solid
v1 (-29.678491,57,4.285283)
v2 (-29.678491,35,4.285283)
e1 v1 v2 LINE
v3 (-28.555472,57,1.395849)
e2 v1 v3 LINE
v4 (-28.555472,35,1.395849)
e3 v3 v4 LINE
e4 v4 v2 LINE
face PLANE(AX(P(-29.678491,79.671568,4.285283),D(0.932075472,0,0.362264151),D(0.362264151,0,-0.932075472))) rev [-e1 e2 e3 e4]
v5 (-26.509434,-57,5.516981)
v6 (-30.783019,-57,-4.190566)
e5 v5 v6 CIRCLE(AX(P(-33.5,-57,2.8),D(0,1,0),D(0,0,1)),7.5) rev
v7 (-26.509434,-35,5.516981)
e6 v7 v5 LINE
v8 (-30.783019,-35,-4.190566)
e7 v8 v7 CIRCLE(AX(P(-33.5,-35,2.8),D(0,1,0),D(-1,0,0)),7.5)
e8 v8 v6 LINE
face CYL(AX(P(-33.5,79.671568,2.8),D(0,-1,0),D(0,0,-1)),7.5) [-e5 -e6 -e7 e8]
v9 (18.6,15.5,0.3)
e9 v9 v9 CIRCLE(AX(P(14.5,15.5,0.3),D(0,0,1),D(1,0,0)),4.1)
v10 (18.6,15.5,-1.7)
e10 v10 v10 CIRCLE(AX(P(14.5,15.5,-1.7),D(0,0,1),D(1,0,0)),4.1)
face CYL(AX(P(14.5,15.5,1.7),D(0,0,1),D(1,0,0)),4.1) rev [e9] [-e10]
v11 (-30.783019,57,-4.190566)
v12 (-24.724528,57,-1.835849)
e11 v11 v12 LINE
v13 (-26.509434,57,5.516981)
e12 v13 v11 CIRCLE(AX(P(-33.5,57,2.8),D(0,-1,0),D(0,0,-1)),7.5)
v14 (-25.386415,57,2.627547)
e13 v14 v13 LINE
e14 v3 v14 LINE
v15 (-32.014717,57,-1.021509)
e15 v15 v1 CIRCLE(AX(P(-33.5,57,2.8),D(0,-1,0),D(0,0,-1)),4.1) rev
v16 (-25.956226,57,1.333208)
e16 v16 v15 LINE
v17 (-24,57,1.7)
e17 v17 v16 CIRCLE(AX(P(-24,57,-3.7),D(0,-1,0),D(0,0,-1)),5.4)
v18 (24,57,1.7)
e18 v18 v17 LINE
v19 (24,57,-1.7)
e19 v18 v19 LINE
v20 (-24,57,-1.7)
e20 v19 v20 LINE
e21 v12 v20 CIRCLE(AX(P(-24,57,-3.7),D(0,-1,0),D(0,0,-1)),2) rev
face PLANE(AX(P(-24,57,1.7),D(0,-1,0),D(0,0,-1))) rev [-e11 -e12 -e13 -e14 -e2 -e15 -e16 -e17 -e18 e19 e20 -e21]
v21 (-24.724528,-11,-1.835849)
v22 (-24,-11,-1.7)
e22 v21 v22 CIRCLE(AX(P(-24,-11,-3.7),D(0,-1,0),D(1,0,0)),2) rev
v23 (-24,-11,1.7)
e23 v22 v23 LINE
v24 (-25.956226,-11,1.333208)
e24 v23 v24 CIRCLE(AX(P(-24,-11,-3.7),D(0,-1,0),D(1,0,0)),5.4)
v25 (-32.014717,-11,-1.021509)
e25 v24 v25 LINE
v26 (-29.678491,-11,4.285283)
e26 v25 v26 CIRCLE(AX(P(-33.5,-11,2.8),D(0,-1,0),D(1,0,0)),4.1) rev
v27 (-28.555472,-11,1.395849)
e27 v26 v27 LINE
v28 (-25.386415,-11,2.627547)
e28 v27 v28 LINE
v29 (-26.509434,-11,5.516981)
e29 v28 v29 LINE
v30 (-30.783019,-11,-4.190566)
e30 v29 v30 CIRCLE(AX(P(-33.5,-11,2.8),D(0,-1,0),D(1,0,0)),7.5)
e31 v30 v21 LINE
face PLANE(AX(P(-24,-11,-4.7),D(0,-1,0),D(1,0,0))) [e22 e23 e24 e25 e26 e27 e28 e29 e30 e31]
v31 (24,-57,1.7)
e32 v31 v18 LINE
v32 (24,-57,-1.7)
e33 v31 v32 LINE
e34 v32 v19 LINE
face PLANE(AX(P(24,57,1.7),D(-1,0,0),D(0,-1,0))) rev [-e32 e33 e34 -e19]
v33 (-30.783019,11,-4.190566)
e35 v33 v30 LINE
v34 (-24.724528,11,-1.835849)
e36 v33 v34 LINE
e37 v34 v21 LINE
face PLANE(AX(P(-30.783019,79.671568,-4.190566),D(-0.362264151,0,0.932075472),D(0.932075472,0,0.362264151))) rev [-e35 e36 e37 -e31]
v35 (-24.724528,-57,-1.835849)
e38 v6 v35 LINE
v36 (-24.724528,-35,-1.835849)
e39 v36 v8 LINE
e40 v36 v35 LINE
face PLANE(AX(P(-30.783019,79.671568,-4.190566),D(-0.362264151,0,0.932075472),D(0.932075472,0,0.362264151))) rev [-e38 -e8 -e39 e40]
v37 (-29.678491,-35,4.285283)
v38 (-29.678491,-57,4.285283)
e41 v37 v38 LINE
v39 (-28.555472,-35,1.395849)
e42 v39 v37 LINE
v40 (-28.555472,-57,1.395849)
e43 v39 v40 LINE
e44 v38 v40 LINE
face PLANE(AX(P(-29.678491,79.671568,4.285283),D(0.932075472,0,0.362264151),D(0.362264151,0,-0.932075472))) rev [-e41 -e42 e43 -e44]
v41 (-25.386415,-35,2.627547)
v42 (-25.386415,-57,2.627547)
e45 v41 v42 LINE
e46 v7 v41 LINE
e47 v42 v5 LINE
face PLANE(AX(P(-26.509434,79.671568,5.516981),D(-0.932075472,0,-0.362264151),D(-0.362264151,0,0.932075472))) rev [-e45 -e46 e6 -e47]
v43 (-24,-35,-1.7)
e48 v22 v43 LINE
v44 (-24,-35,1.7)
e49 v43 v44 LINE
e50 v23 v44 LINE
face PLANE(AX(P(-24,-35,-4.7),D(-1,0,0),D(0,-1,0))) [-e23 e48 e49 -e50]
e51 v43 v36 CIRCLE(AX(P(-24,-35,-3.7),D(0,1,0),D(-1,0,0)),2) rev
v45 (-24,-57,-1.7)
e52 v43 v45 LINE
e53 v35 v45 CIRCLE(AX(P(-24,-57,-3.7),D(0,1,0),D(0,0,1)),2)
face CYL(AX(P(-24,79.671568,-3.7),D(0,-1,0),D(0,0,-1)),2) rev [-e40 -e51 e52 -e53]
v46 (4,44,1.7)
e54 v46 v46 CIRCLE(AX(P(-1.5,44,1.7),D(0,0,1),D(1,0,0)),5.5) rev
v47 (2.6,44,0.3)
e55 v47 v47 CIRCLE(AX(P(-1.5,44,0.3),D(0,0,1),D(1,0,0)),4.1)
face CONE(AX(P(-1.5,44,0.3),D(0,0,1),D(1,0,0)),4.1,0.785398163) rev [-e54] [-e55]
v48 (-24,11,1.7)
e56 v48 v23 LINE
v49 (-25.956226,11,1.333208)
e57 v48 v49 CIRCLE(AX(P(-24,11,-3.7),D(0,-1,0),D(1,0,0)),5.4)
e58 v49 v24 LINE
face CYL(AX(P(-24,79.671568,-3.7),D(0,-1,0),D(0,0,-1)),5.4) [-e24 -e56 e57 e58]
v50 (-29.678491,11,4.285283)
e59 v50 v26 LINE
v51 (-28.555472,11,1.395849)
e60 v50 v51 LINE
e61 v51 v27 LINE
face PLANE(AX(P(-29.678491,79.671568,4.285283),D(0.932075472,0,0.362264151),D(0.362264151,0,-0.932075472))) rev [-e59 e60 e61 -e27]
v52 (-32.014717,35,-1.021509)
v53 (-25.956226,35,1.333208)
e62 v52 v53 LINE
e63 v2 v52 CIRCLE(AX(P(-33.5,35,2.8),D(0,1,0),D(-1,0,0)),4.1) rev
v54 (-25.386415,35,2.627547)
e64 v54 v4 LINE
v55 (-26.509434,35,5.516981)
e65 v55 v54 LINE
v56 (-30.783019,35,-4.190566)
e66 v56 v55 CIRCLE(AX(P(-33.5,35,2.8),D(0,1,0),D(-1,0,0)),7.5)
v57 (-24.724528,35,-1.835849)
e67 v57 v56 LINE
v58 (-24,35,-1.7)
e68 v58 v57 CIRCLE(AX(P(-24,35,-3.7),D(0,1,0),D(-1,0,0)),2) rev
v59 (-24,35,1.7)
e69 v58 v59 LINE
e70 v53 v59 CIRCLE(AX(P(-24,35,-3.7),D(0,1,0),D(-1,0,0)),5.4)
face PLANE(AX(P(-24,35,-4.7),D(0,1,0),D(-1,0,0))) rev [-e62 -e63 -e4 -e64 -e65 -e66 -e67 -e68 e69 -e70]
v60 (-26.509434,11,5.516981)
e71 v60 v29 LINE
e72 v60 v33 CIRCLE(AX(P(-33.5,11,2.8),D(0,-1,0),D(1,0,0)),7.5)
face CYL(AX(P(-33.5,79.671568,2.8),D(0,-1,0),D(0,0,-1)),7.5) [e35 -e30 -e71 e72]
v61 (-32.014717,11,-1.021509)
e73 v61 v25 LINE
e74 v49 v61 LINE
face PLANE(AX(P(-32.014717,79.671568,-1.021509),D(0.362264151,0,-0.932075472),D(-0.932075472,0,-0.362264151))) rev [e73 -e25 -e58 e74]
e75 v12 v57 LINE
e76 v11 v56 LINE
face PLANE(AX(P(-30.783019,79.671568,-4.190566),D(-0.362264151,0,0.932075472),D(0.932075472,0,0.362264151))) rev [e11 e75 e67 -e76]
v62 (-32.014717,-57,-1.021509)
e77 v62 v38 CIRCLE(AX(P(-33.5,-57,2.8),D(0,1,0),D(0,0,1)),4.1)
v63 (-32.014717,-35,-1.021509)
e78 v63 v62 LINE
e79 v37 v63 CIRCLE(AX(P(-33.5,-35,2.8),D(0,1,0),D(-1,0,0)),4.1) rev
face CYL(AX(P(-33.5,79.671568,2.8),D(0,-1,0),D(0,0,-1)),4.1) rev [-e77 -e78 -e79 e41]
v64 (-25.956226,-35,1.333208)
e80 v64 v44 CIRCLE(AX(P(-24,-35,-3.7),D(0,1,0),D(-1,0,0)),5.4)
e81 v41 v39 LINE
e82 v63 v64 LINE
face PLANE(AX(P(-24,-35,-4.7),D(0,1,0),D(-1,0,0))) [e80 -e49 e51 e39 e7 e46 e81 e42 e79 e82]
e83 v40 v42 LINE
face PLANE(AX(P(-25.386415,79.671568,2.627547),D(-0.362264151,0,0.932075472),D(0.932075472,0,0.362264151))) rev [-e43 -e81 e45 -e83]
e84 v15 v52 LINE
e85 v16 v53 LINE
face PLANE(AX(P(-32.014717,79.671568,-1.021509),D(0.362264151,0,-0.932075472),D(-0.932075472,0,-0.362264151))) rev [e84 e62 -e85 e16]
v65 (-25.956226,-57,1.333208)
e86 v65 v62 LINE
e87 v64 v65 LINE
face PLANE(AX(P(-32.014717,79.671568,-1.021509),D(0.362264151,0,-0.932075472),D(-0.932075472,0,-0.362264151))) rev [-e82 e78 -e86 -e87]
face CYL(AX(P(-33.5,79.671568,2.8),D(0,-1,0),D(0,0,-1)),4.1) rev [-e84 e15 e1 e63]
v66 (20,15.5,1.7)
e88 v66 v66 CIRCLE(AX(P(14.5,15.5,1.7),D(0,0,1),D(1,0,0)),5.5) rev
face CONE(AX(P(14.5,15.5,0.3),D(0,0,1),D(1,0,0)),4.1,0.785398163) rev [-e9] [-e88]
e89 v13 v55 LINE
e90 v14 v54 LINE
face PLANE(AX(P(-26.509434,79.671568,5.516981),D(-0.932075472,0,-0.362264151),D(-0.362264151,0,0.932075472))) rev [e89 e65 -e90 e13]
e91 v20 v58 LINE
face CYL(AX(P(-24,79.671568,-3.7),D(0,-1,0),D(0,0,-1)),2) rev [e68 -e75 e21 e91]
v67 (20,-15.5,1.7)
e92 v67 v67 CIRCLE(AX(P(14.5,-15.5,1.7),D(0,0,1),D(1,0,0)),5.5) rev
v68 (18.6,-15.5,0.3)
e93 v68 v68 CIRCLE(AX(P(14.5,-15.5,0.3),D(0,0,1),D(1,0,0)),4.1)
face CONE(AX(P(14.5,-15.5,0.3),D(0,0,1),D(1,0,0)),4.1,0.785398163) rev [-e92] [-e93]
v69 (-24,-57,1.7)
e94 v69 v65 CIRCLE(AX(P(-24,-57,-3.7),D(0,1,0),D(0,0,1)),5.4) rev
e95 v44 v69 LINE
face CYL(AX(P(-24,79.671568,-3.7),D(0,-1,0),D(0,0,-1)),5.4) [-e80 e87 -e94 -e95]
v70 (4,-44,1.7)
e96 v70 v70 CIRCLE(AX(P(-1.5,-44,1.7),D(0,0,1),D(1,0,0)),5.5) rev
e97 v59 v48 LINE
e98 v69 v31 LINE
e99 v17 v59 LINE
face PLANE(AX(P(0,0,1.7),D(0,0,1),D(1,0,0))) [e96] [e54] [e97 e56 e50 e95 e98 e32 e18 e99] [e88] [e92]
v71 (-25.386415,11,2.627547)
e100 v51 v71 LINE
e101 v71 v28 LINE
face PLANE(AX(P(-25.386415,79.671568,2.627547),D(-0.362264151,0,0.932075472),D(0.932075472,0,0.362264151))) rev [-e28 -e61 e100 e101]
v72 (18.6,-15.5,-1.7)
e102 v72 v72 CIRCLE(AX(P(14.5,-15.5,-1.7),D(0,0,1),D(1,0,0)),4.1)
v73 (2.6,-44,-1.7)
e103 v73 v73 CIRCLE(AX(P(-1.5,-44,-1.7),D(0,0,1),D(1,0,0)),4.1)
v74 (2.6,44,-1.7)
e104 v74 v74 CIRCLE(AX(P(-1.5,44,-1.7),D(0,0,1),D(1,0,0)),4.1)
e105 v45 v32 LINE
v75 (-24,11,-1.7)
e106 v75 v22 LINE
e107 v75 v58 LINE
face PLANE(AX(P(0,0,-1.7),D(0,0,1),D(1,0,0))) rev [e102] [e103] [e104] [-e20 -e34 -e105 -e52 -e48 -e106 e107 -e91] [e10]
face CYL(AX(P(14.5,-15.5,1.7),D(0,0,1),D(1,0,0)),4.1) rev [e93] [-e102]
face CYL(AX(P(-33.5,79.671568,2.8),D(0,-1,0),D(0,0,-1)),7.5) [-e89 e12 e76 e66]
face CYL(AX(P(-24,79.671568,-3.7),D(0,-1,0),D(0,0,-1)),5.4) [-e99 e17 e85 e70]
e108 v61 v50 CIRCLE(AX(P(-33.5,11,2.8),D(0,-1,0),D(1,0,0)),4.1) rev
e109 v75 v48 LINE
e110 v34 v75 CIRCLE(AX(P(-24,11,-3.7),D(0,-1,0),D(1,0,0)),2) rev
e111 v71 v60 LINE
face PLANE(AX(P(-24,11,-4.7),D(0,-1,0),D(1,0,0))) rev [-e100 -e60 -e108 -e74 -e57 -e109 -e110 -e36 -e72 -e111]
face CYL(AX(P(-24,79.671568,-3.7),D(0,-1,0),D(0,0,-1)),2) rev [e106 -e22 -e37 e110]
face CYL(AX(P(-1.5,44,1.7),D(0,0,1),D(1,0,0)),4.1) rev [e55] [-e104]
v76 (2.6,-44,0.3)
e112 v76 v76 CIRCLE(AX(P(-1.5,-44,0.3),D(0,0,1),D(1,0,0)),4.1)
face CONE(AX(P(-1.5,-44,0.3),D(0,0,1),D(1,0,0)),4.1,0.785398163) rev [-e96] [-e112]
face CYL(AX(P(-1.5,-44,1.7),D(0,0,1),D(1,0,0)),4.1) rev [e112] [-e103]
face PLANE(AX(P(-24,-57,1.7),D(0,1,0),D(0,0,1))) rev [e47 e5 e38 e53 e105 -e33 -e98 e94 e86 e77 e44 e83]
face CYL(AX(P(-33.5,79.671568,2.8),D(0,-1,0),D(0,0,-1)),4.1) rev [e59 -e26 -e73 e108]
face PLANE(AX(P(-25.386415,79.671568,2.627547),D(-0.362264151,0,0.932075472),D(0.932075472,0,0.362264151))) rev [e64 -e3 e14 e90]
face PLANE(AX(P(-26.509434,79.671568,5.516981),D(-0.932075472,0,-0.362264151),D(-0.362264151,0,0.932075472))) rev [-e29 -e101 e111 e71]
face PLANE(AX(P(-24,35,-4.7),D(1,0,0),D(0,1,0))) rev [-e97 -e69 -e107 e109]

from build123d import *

# Parameters (mm, degrees)
BODYS_W                       = 48
BODYS_H                       = 114
BODY_DEPTH                    = 1.7
MIRROR1_START                 = -1.7
MIRROR1_OUTLINE_R             = 4.1
MIRROR1_DEPTH                 = 3.4
KNUCKLEBODY_REACH             = 63.87
KNUCKLEBODY_DIRECTION_2_REACH = 63.87
HOLECHAMFER_SIZE              = 1.4
KNUCKLECUTS_W                 = 17
KNUCKLECUTS_H                 = 24
KNUCKLECUT_DEPTH              = 71.965414111


# Read off the part's stored shape, not the designer's step: Mirror1
with BuildPart() as part:
    # BodyS → Body (new, symmetric)
    with BuildSketch(Plane.XY):
        Rectangle(BODYS_W, BODYS_H)
    extrude(amount=BODY_DEPTH, both=True)

    # Mirror1 outline → Mirror1 (cut)
    with BuildSketch(Plane.XY.offset(MIRROR1_START)):
        with Locations((14.5, 15.5)):
            Circle(MIRROR1_OUTLINE_R)
        with Locations((-1.5, 44)):
            Circle(MIRROR1_OUTLINE_R)
        with Locations((14.5, -15.5)):
            Circle(MIRROR1_OUTLINE_R)
        with Locations((-1.5, -44)):
            Circle(MIRROR1_OUTLINE_R)
    extrude(amount=MIRROR1_DEPTH, mode=Mode.SUBTRACT)

    # KnuckleBody: up to this face of the body (flat: up to its plane)
    knucklebody_end = Plane(part.part.faces().sort_by_distance((0, 57, 0))[0])
    # KnuckleBodyS → KnuckleBody (add, up to the picked face)
    with BuildSketch(Plane(origin=(0, 0, 0), x_dir=(1, 0, 0), z_dir=(0, 1, 0)), mode=Mode.PRIVATE) as knucklebody_sk1:
        with BuildLine():
            Line((-30.783018868, 4.190566038), (-24.724528302, 1.835849057))
            ThreePointArc((-24.724528302, 1.835849057), (-24.36857707, 1.734255626), (-24, 1.7))
            Line((-24, 1.7), (-24, -1.7))
            ThreePointArc((-24, -1.7), (-24.995158089, -1.607509809), (-25.956226415, -1.333207547))
            Line((-25.956226415, -1.333207547), (-32.014716981, 1.021509434))
            ThreePointArc((-32.014716981, 1.021509434), (-37.25246893, -4.451961541), (-29.678490566, -4.285283019))
            Line((-29.678490566, -4.285283019), (-28.555471698, -1.395849057))
            Line((-28.555471698, -1.395849057), (-25.386415094, -2.62754717))
            Line((-25.386415094, -2.62754717), (-26.509433962, -5.516981132))
            ThreePointArc((-26.509433962, -5.516981132), (-40.364272432, -5.821880867), (-30.783018868, 4.190566038))
        make_face()
    knucklebody_tool1 = split(extrude(knucklebody_sk1.sketch, amount=KNUCKLEBODY_REACH, mode=Mode.PRIVATE), bisect_by=knucklebody_end, keep=Keep.BOTH, mode=Mode.PRIVATE)
    add(knucklebody_tool1.solids().sort_by(Axis((-40.156774, 0, 5.730533), (0, 1, 0)))[0])

    # KnuckleBody direction 2: up to this face of the body (flat: up to its plane)
    knucklebody_direction_2_end = Plane(part.part.faces().sort_by_distance((0, -57, 0))[0])
    # KnuckleBodyS → KnuckleBody direction 2 (add, up to the picked face)
    with BuildSketch(Plane(origin=(0, 0, 0), x_dir=(1, 0, 0), z_dir=(0, 1, 0)), mode=Mode.PRIVATE) as knucklebody_direction_2_sk1:
        with BuildLine():
            Line((-30.783018868, 4.190566038), (-24.724528302, 1.835849057))
            ThreePointArc((-24.724528302, 1.835849057), (-24.36857707, 1.734255626), (-24, 1.7))
            Line((-24, 1.7), (-24, -1.7))
            ThreePointArc((-24, -1.7), (-24.995158089, -1.607509809), (-25.956226415, -1.333207547))
            Line((-25.956226415, -1.333207547), (-32.014716981, 1.021509434))
            ThreePointArc((-32.014716981, 1.021509434), (-37.25246893, -4.451961541), (-29.678490566, -4.285283019))
            Line((-29.678490566, -4.285283019), (-28.555471698, -1.395849057))
            Line((-28.555471698, -1.395849057), (-25.386415094, -2.62754717))
            Line((-25.386415094, -2.62754717), (-26.509433962, -5.516981132))
            ThreePointArc((-26.509433962, -5.516981132), (-40.364272432, -5.821880867), (-30.783018868, 4.190566038))
        make_face()
    knucklebody_direction_2_tool1 = split(extrude(knucklebody_direction_2_sk1.sketch, amount=-KNUCKLEBODY_DIRECTION_2_REACH, mode=Mode.PRIVATE), bisect_by=knucklebody_direction_2_end, keep=Keep.BOTH, mode=Mode.PRIVATE)
    add(knucklebody_direction_2_tool1.solids().sort_by(Axis((-40.156774, 0, 5.730533), (0, -1, 0)))[0])

    # HoleChamfer
    holechamfer_edges = [part.edges().sort_by_distance(p)[0] for p in [
        (10.4, 15.5, 1.7),
        (-5.6, 44, 1.7),
        (10.4, -15.5, 1.7),
        (-5.6, -44, 1.7),
    ]]
    chamfer(holechamfer_edges, length=HOLECHAMFER_SIZE)

    # KnuckleCutS → KnuckleCut (cut, symmetric)
    with BuildSketch(Plane.XY):
        with Locations((-32.5, 23)):
            Rectangle(KNUCKLECUTS_W, KNUCKLECUTS_H)
    knucklecut = extrude(amount=KNUCKLECUT_DEPTH, both=True, mode=Mode.SUBTRACT)

    # KCVM: KnuckleCut across plane
    add(knucklecut.mirror(Plane.ZX), mode=Mode.SUBTRACT)


solid = part.part
